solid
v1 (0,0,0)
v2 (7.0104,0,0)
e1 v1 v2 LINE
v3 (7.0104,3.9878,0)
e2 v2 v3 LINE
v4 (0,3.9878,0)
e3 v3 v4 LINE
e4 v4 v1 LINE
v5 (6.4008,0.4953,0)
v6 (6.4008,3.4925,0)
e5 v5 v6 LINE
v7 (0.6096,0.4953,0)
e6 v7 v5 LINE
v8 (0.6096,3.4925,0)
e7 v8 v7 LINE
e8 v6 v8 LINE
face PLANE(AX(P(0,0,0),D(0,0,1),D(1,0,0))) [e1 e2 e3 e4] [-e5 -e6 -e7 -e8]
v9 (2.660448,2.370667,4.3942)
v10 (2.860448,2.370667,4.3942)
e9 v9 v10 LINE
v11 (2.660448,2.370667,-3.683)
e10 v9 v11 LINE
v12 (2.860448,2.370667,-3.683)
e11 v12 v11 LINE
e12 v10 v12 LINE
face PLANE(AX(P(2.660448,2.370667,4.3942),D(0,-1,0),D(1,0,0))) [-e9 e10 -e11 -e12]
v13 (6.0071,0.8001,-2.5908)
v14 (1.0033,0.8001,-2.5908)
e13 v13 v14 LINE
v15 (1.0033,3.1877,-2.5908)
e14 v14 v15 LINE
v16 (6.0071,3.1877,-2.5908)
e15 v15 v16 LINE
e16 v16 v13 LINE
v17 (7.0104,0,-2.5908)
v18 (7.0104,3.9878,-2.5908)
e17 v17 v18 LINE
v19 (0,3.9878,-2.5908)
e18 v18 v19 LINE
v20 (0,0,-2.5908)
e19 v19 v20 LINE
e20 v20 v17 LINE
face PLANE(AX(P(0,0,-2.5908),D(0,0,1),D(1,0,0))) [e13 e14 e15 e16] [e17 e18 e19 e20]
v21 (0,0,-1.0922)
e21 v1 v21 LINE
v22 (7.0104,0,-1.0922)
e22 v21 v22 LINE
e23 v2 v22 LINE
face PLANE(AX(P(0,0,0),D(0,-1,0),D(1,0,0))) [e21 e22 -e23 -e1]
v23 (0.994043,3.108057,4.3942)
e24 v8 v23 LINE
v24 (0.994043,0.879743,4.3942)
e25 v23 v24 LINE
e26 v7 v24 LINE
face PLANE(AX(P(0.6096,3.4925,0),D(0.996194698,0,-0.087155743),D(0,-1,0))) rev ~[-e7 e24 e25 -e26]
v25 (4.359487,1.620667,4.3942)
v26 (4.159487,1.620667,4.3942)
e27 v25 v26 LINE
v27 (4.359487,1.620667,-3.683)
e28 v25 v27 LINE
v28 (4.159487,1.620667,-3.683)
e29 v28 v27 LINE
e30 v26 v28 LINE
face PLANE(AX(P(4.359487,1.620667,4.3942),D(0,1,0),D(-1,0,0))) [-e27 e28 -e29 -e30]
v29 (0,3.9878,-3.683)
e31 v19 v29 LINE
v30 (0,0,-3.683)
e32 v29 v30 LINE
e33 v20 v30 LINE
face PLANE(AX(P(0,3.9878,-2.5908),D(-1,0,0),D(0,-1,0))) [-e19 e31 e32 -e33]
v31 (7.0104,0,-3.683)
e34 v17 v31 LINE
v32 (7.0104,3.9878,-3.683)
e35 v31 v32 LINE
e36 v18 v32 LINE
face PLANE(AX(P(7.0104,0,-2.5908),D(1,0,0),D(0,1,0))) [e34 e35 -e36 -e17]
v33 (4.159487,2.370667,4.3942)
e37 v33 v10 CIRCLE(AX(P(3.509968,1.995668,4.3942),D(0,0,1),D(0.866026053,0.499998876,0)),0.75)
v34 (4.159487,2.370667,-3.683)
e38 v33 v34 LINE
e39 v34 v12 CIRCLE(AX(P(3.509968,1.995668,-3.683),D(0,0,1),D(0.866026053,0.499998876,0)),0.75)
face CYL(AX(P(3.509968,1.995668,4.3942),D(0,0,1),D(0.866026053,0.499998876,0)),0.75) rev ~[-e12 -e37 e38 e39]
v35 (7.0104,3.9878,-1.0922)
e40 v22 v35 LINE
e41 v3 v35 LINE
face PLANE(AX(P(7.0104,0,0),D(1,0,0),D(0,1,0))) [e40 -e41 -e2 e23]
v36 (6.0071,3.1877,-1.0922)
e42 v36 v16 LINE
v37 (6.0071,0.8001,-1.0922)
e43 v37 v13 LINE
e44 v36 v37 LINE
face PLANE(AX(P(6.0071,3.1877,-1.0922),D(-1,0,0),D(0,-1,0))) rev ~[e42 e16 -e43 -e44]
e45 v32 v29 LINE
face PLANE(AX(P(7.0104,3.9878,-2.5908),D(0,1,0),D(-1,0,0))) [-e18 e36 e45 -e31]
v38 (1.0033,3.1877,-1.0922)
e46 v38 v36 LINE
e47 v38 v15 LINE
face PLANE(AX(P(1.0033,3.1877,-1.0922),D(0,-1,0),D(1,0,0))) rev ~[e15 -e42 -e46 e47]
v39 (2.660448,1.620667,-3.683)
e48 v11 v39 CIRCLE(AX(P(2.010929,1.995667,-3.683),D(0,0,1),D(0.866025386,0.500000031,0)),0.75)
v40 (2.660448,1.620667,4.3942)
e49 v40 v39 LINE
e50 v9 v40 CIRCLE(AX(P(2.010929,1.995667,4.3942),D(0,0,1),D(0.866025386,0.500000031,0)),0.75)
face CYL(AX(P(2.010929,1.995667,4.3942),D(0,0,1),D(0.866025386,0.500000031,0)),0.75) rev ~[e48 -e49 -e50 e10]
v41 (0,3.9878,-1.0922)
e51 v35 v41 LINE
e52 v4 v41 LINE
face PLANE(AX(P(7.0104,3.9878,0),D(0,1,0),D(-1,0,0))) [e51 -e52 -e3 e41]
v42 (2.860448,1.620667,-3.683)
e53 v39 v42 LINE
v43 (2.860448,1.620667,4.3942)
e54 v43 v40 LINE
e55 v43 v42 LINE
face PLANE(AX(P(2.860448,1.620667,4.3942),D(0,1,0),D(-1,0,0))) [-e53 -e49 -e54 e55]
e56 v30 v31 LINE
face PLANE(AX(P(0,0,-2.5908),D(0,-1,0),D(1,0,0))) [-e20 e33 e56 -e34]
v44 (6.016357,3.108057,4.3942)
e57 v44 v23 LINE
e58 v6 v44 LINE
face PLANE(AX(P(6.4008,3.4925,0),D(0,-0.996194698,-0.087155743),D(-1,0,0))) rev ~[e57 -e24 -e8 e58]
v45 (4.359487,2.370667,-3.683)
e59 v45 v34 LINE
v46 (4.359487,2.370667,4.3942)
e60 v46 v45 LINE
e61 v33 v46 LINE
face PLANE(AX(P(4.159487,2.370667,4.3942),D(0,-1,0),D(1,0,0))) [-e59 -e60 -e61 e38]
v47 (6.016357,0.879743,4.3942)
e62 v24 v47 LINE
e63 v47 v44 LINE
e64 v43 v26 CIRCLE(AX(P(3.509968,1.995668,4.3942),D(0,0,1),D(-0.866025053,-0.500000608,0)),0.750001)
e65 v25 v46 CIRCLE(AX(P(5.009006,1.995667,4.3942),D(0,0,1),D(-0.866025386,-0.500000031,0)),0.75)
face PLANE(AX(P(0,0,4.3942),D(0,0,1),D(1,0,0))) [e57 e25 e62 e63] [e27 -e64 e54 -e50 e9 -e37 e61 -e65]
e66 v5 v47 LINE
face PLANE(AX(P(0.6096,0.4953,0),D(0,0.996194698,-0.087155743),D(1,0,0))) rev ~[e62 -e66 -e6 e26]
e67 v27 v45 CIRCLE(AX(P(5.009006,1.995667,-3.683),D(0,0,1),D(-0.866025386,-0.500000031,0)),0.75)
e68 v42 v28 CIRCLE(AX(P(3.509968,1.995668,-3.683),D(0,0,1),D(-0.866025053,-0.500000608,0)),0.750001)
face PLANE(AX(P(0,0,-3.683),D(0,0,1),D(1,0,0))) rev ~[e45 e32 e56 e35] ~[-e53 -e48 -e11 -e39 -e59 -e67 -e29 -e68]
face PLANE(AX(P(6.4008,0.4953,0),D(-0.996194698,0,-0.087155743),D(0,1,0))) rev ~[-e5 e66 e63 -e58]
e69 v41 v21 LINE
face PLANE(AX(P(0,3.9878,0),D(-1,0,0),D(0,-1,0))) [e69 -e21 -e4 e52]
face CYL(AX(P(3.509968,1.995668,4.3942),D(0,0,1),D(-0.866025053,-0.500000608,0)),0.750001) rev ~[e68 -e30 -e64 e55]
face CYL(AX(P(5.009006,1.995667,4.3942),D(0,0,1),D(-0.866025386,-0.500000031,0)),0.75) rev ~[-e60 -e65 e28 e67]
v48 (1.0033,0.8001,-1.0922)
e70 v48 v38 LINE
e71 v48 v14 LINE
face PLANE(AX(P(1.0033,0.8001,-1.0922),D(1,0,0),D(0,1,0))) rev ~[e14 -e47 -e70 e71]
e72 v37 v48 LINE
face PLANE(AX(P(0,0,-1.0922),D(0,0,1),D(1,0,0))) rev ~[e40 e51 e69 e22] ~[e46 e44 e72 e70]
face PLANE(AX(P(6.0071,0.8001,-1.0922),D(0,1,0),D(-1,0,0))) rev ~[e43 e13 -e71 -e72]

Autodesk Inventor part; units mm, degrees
ref_plane "YZ Plane" through (0, 0, 0) normal (1, 0, 0) x (0, 1, 0)
ref_plane "XZ Plane" through (0, 0, 0) normal (0, 1, 0) x (-1, 0, 0)
ref_plane "XY Plane" through (0, 0, 0) normal (0, 0, 1) x (1, 0, 0)
sketch "Sketch1" plane through (0, 0, 0) normal (0, 0, 1) x (1, 0, 0)
  line L0 (0, 0) -> (7.0104, 0)
  line L1 (7.0104, 0) -> (7.0104, 3.9878)
  line L2 (7.0104, 3.9878) -> (0, 3.9878)
  line L3 (0, 3.9878) -> (0, 0)
  dimension "d0" = 7.0104
  dimension "d1" = 3.9878
extrude "Extrusion1" add sketch "Sketch1" against normal blind 1.0922
sketch "Sketch2" plane through (0, 0, -1.0922) normal (0, 0, -1) x (-1, 0, 0)
  line L0 (-7.0104, 0) -> (-7.0104, 3.9878) projected
  line L1 (-7.0104, 3.9878) -> (0, 3.9878) projected
  line L2 (-6.0071, 0.8001) -> (-1.0033, 0.8001)
  line L3 (-1.0033, 0.8001) -> (-1.0033, 3.1877)
  line L4 (-1.0033, 3.1877) -> (-6.0071, 3.1877)
  line L5 (-6.0071, 3.1877) -> (-6.0071, 0.8001)
  point P0 (-3.5052, 3.1877)
  point P1 (-3.5052, 3.9878)
  point P2 (-6.0071, 1.9939)
  point P3 (-7.0104, 1.9939)
  dimension "d4" = 5.0038
  dimension "d5" = 2.3876
extrude "Extrusion2" add sketch "Sketch2" along normal blind 1.4986
pattern_linear "Rectangular Pattern1" count 2 spacing 2.5908 along (0, 0, -1) of "Extrusion1"
sketch "Sketch3" plane through (0, 0, 0) normal (0, 0, 1) x (1, 0, 0)
  line L0 (6.0071, 3.1877) -> (1.0033, 3.1877) projected
  line L1 (1.0033, 3.1877) -> (1.0033, 0.8001) projected
  line L2 (1.0033, 0.8001) -> (6.0071, 0.8001) projected
  line L3 (6.0071, 0.8001) -> (6.0071, 3.1877) projected
  line L4 (7.0104, 3.9878) -> (0, 3.9878) projected
  line L5 (0, 3.9878) -> (0, 0) projected
  line L6 (0.6096, 0.4953) -> (6.4008, 0.4953)
  line L7 (6.4008, 0.4953) -> (6.4008, 3.4925)
  line L8 (6.4008, 3.4925) -> (0.6096, 3.4925)
  line L9 (0.6096, 3.4925) -> (0.6096, 0.4953)
  point P0 (3.5052, 3.4925)
  point P1 (3.5052, 3.9878)
  point P2 (0.6096, 1.9939)
  point P3 (0, 1.9939)
  dimension "d14" = 5.7912
  dimension "d15" = 2.9972
sketch "Sketch3 outline for Extrusion3" plane through (0, 0, 0) normal (0, 0, 1) x (1, 0, 0)
  line L0 (0.6096, 3.4925) -> (0.6096, 0.4953)
  line L1 (6.4008, 3.4925) -> (0.6096, 3.4925)
  line L2 (6.4008, 0.4953) -> (6.4008, 3.4925)
  line L3 (0.6096, 0.4953) -> (6.4008, 0.4953)
extrude "Extrusion3" add sketch "Sketch3 outline for Extrusion3" along normal blind 4.3942 draft -5
sketch "Sketch4" plane through (0, 0, 4.3942) normal (0, 0, 1) x (1, 0, 0)
  line L0 (0.994043, 0.879743) -> (0.994043, 3.108057)
  line L1 (6.016357, 0.879743) -> (0.994043, 0.879743)
  line L2 (6.016357, 3.108057) -> (6.016357, 0.879743)
  line L3 (0.994043, 3.108057) -> (6.016357, 3.108057)
  line L4 (6.025892, 3.111592) -> (0.994043, 3.111592)
  line L5 (0.994043, 3.111592) -> (0.994043, 0.879743)
  line L6 (0.994043, 0.879743) -> (6.025892, 0.879743)
  line L7 (6.025892, 0.879743) -> (6.025892, 3.111592)
  line L8 (2.860448, 1.620667) -> (2.660448, 1.620667)
  arc A0 (2.660448, 2.370667) -> (2.660448, 1.620667) centre (2.010929, 1.995667) ccw
  line L9 (2.660448, 2.370667) -> (2.860448, 2.370667)
  arc A1 (4.159487, 2.370667) -> (2.860448, 2.370667) centre (3.509967, 1.995667) ccw
  line L10 (4.159487, 2.370667) -> (4.359487, 2.370667)
  arc A2 (4.359487, 1.620667) -> (4.359487, 2.370667) centre (5.009006, 1.995667) ccw
  line L11 (4.359487, 1.620667) -> (4.159487, 1.620667)
  arc A3 (2.860448, 1.620667) -> (4.159487, 1.620667) centre (3.509967, 1.995667) ccw
  point P0 (0, 0)
extrude "Extrusion4" cut sketch "Sketch4" against normal up to next contours L8 A0 L9 A1 L10 A2 L11 A3
properties part number "276-2154" material "Rubber"
